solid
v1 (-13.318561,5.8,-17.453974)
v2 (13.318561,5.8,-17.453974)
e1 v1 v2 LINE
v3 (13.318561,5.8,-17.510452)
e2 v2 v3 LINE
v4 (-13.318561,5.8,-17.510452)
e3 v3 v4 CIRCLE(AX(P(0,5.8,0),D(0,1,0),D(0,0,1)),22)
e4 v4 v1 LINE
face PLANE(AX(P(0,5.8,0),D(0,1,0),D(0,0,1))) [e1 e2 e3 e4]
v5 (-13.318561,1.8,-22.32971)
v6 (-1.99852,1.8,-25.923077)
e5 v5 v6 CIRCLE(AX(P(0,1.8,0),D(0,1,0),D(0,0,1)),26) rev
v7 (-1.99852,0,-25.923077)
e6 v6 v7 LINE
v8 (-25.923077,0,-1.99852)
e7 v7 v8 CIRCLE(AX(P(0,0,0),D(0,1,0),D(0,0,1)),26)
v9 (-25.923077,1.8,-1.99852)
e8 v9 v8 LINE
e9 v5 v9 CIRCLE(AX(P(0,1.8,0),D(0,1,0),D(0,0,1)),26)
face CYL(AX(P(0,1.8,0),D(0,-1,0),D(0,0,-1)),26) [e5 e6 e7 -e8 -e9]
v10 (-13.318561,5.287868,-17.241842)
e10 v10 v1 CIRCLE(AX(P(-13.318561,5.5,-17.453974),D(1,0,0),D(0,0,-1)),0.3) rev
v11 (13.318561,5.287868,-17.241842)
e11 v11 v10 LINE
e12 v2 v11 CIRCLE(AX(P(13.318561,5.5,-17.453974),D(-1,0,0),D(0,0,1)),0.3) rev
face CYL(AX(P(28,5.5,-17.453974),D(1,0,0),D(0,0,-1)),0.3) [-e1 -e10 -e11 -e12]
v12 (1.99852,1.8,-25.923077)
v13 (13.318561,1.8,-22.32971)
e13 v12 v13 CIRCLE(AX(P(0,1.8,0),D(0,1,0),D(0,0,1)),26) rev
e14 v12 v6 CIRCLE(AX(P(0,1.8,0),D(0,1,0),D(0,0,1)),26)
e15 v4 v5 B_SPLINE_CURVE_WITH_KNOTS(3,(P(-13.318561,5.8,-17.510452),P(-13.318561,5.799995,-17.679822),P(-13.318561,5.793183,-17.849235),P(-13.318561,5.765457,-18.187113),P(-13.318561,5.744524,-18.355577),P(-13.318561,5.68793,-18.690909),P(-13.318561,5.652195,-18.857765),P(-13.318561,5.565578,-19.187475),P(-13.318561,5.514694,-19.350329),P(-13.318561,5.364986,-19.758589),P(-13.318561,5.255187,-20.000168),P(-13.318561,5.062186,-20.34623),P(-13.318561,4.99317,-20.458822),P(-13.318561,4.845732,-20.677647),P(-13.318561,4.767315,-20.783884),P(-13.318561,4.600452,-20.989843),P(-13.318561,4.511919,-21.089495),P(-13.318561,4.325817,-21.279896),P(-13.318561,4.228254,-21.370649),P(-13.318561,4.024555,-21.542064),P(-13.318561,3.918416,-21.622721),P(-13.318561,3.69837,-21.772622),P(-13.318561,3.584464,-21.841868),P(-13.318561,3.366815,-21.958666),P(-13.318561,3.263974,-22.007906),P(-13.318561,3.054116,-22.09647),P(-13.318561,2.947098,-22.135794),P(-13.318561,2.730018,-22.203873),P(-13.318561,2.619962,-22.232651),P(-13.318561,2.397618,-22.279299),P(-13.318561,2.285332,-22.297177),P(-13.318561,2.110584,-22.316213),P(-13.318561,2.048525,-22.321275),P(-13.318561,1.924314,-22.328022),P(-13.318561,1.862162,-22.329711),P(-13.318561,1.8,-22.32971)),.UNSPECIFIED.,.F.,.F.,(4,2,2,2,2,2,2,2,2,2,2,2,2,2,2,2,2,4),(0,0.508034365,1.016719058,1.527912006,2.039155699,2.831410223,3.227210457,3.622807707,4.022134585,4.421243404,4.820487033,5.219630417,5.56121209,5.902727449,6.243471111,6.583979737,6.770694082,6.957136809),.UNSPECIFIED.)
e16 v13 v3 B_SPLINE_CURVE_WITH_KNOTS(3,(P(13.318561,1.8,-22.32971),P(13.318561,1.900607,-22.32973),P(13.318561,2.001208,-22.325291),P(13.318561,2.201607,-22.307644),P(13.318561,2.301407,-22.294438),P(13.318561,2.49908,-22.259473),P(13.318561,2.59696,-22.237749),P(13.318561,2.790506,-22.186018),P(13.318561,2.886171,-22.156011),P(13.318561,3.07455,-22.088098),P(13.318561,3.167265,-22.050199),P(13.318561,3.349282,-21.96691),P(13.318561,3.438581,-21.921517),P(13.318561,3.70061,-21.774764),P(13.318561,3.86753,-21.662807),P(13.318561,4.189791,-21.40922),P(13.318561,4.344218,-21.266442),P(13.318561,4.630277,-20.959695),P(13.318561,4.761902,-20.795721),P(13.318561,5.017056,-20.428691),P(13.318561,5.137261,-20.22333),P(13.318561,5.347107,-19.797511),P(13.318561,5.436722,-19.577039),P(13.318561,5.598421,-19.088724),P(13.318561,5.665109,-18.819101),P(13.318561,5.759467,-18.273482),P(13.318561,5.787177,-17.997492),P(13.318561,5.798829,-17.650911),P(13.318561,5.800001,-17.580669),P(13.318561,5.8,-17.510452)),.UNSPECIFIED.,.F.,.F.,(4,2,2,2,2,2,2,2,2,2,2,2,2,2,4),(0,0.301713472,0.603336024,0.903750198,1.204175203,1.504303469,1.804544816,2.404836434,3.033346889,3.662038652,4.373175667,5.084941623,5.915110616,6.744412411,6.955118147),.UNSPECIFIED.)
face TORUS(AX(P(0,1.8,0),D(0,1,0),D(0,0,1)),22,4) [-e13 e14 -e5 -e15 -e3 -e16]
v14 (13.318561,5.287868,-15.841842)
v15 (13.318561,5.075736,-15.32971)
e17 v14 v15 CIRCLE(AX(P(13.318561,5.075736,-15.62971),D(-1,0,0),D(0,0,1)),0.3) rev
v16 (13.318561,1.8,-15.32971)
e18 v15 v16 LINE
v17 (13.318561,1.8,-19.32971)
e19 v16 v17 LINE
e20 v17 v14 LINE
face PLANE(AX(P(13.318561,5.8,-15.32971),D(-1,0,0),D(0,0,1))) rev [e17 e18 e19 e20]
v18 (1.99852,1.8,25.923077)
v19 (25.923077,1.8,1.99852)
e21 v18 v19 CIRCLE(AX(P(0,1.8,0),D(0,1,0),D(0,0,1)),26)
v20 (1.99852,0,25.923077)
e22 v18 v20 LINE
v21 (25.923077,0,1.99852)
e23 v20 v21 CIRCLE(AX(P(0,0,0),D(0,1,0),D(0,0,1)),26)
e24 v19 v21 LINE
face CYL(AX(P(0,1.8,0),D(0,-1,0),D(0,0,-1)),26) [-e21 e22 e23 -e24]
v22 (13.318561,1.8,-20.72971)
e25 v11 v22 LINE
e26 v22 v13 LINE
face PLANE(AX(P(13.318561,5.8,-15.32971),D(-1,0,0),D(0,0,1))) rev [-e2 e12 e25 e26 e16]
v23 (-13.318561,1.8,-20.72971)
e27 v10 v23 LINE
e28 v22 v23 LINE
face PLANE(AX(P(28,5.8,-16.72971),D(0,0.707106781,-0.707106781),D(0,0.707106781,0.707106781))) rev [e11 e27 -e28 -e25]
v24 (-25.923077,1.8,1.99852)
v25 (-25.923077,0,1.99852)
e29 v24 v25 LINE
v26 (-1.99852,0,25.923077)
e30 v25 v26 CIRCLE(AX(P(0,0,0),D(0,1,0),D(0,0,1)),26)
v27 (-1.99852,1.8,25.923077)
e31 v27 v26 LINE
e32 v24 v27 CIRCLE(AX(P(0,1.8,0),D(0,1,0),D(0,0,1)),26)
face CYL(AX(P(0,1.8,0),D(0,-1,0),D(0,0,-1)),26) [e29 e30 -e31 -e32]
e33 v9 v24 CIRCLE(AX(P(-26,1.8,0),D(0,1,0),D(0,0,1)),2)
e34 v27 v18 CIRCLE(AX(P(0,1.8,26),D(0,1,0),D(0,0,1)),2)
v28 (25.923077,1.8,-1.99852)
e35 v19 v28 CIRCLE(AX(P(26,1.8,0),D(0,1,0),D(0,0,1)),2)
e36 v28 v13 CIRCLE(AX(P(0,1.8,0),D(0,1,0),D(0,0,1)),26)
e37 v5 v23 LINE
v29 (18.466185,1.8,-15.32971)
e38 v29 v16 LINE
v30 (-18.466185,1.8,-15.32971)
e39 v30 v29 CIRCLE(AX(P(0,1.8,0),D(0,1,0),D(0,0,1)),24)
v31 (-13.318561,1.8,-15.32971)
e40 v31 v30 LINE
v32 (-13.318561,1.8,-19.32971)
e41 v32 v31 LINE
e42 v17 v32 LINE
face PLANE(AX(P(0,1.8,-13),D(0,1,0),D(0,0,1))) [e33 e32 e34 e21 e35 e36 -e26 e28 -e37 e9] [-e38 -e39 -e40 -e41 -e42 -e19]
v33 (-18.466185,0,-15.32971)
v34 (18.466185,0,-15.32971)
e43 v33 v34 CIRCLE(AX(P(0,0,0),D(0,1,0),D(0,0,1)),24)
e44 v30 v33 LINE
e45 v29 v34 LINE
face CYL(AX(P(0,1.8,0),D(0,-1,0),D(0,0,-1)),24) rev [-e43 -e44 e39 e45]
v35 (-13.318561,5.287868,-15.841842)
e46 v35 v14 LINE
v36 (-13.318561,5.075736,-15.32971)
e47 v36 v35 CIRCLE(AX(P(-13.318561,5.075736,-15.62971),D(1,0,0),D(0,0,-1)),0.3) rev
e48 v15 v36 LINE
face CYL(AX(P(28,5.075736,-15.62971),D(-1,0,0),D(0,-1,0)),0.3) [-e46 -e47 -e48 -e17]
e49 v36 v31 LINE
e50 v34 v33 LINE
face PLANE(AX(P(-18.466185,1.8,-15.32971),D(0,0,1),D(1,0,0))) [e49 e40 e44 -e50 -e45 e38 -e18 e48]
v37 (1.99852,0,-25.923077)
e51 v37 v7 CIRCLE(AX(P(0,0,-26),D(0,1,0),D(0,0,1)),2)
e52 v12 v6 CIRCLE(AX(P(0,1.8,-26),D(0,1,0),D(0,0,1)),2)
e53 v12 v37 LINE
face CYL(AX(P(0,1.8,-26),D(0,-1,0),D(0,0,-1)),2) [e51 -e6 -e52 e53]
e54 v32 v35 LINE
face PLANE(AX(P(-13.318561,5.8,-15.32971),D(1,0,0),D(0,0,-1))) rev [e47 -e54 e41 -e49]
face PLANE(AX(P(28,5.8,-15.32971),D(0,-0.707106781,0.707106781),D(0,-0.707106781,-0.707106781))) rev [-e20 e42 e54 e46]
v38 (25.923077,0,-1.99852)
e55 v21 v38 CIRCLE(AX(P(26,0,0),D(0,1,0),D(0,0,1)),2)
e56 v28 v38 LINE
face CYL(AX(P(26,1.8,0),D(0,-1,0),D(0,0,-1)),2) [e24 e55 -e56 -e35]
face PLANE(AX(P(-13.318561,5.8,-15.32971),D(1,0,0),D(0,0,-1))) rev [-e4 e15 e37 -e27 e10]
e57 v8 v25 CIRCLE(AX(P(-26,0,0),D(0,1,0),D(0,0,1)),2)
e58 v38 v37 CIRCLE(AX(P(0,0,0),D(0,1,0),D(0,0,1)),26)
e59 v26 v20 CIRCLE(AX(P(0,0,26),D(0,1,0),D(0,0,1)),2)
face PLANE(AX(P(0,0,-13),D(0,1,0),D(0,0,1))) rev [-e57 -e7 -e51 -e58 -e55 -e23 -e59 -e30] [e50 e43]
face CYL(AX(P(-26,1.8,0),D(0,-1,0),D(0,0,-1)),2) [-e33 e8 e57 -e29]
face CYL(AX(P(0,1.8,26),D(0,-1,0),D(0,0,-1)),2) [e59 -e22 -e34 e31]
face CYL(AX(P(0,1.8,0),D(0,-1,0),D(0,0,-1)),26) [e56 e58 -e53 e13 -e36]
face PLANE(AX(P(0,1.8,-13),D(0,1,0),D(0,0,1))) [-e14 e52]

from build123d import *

# Parameters (mm, degrees)
BOSS_EXTRUDE1_DEPTH = 1.8
BOSS_EXTRUDE3_DEPTH = 4
CUT_EXTRUDE1_DEPTH  = 51.248019596
FILLET1_R           = 4
FILLET2_R           = 0.3


with BuildPart() as part:
    # Sketch1 → Boss-Extrude1 (new body)
    with BuildSketch(Plane(origin=(0, 0, 0), x_dir=(1, 0, 0), z_dir=(0, 1, 0))):
        with BuildLine():
            ThreePointArc((-1.998520163, 25.923076923), (-18.384776311, 18.384776311), (-25.923076923, 1.998520163))
            ThreePointArc((-25.923076923, 1.998520163), (-28, 0), (-25.923076923, -1.998520163))
            ThreePointArc((-25.923076923, -1.998520163), (-18.384776311, -18.384776311), (-1.998520163, -25.923076923))
            ThreePointArc((-1.998520163, -25.923076923), (0, -28), (1.998520163, -25.923076923))
            ThreePointArc((1.998520163, -25.923076923), (18.384776311, -18.384776311), (25.923076923, -1.998520163))
            ThreePointArc((25.923076923, -1.998520163), (28, 0), (25.923076923, 1.998520163))
            ThreePointArc((25.923076923, 1.998520163), (18.384776311, 18.384776311), (1.998520163, 25.923076923))
            ThreePointArc((1.998520163, 25.923076923), (0, 28), (-1.998520163, 25.923076923))
        make_face()
        with BuildLine():
            Line((-18.466185313, 15.329709717), (18.466185313, 15.329709717))
            ThreePointArc((18.466185313, 15.329709717), (0, -24), (-18.466185313, 15.329709717))
        make_face(mode=Mode.SUBTRACT)
    extrude(amount=BOSS_EXTRUDE1_DEPTH)

    # Sketch2 → Boss-Extrude3 (add)
    with BuildSketch(Plane(origin=(0, 1.8, 0), x_dir=(1, 0, 0), z_dir=(0, 1, 0))):
        with BuildLine():
            Line((-13.318560882, 15.329709717), (13.318560882, 15.329709717))
            Line((13.318560882, 15.329709717), (13.318560882, 22.329709717))
            ThreePointArc((13.318560882, 22.329709717), (0, 26), (-13.318560882, 22.329709717))
            Line((-13.318560882, 22.329709717), (-13.318560882, 15.329709717))
        make_face()
    extrude(amount=BOSS_EXTRUDE3_DEPTH)

    # Sketch3 → Cut-Extrude1 (cut, through all)
    with BuildSketch(Plane.ZY.offset(13.318560882)):
        Polygon((-15.329709717, 5.8), (-19.329709717, 1.8), (-20.729709717, 1.8), (-16.729709717, 5.8), align=None)
    extrude(amount=-CUT_EXTRUDE1_DEPTH, mode=Mode.SUBTRACT)

    # Fillet1
    fillet1_edges = [part.edges().sort_by_distance(p)[0] for p in [
        (0, 5.8, -26),
    ]]
    fillet(fillet1_edges, radius=FILLET1_R - 0.0001)  # a hair under: the kernel refuses the full size

    # Fillet2
    fillet2_edges = [part.edges().sort_by_distance(p)[0] for p in [
        (0, 5.8, -15.329709717),
        (0, 5.8, -16.729709717),
    ]]
    fillet(fillet2_edges, radius=FILLET2_R)


solid = part.part
